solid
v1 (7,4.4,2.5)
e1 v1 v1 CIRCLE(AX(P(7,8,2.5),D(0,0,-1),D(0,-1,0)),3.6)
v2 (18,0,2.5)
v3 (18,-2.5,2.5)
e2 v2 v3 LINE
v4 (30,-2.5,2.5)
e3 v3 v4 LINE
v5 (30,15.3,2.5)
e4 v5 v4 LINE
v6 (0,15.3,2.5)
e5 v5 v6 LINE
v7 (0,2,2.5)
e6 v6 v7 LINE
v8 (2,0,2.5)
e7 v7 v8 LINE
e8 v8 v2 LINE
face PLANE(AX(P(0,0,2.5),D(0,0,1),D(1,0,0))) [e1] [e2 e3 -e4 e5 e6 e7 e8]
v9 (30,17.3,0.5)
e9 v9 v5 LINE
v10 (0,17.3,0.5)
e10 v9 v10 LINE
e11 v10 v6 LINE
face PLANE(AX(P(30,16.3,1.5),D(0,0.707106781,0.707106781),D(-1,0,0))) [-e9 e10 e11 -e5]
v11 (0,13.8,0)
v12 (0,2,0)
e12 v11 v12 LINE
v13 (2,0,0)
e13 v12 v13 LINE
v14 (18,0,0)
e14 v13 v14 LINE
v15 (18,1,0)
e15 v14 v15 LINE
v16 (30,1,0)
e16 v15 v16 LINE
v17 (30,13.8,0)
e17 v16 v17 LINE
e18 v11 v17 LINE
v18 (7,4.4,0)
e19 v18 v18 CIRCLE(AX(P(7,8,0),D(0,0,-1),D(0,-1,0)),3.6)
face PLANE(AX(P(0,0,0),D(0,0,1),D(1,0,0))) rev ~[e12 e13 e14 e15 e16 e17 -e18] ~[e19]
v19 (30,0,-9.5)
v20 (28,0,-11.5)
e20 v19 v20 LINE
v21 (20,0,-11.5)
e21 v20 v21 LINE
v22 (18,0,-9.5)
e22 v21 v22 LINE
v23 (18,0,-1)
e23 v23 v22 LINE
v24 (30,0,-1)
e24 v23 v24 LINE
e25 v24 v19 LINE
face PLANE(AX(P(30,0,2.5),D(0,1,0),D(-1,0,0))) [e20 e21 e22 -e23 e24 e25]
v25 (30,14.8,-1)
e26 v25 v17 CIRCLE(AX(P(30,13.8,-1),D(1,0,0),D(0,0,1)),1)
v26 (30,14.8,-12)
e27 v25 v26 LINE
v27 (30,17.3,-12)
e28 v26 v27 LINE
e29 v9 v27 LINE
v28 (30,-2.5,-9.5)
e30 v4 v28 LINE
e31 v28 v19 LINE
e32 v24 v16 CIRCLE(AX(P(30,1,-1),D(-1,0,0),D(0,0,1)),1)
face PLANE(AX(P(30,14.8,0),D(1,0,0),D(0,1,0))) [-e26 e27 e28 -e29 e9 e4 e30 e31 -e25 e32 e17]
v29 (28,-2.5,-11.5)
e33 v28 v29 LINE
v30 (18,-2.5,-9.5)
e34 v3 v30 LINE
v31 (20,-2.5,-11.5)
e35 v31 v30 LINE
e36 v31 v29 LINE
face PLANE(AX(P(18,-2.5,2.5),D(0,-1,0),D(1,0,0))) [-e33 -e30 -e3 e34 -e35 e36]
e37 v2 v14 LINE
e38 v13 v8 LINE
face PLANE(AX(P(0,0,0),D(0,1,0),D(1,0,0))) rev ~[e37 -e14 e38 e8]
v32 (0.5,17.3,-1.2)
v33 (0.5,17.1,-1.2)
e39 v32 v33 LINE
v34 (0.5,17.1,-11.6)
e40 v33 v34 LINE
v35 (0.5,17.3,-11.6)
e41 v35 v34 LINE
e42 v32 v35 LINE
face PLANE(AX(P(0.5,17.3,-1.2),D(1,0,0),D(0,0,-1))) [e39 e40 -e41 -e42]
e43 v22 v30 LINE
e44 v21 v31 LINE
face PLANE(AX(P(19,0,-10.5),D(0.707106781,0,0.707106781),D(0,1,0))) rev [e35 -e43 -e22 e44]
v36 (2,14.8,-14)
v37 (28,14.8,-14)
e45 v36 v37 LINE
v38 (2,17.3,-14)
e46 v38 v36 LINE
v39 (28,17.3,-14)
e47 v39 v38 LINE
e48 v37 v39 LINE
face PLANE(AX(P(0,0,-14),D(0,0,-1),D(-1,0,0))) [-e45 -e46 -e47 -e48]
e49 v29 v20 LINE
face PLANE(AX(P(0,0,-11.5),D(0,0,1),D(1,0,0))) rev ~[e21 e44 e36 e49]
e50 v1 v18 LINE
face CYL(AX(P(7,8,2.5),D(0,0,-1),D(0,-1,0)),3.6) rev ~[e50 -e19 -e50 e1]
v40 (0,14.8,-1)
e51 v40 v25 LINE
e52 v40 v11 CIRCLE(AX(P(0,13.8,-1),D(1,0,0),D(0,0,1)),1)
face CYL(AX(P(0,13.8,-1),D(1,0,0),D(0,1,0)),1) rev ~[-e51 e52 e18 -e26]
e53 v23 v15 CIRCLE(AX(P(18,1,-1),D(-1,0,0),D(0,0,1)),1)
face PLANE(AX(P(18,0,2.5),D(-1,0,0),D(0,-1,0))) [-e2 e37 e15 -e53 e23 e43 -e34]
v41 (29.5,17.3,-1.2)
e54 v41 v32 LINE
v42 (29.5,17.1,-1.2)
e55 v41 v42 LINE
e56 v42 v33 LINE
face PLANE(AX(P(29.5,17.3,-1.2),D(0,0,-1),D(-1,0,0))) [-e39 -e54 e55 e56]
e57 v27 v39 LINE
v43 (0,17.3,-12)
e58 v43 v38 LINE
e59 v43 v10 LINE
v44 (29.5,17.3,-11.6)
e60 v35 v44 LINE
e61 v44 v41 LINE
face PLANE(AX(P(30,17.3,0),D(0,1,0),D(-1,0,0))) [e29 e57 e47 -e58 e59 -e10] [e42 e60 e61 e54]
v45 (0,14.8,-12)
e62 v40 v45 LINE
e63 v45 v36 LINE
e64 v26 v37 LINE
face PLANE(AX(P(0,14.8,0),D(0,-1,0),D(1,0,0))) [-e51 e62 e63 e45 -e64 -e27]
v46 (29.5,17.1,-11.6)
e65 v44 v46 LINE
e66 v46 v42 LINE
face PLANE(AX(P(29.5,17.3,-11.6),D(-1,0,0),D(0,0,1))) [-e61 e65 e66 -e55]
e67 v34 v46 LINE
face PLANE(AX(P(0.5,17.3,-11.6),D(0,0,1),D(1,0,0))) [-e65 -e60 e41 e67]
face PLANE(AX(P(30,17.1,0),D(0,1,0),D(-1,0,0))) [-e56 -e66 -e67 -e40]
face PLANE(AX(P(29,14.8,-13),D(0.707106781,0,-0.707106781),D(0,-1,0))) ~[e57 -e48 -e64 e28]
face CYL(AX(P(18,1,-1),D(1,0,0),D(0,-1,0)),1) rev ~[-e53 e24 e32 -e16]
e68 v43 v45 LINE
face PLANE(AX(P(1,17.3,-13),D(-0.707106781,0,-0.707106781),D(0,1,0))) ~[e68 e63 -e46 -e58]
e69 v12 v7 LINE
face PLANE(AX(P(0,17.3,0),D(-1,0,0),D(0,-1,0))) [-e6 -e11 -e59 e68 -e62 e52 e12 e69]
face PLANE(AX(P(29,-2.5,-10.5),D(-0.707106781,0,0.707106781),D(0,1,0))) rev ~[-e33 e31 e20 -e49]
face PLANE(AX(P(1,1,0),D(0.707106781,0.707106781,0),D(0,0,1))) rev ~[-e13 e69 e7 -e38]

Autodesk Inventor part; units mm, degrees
ref_plane "YZ Plane" through (0, 0, 0) normal (1, 0, 0) x (0, 1, 0)
ref_plane "XZ Plane" through (0, 0, 0) normal (0, 1, 0) x (-1, 0, 0)
ref_plane "XY Plane" through (0, 0, 0) normal (0, 0, 1) x (1, 0, 0)
sketch "Sketch1" plane through (0, 0, 0) normal (0, 0, 1) x (1, 0, 0)
  line L0 (0, 0) -> (30, 0)
  line L1 (30, 0) -> (30, 17.3)
  line L2 (30, 17.3) -> (0, 17.3)
  line L3 (0, 17.3) -> (0, 0)
  dimension "d0" = 30
  dimension "d1" = 17.3
extrude "Extrusion1" add sketch "Sketch1" along normal blind 2.5
sketch "Sketch2" plane through (0, 0, 2.5) normal (0, 0, 1) x (1, 0, 0)
  line L0 (0, 17.3) -> (0, 0) projected
  line L1 (0, 0) -> (30, 0) projected
  point P0 (7, 8)
  dimension "d4" = 7
  dimension "d12" = 8
hole "Hole1" at (7, 8, 2.5) direction (0, 0, -1) diameter 7.2 end through all
sketch "Sketch3" plane through (0, 0, 2.5) normal (0, 0, 1) x (1, 0, 0)
  line L0 (30, 0) -> (30, 17.3) projected
  line L1 (30, 0) -> (18, 0)
  line L2 (18, 0) -> (18, -2.5)
  line L3 (18, -2.5) -> (30, -2.5)
  line L4 (30, -2.5) -> (30, 0)
  point P0 (0, 0)
  dimension "d13" = 2.5
  dimension "d14" = 12
extrude "Extrusion2" add sketch "Sketch3" against normal blind 14
sketch "Sketch4" plane through (18, 0, 0) normal (0, 1, 0) x (1, 0, 0)
  line L0 (3.25, 3) -> (8.75, 3)
  line L1 (8.75, 3) -> (8.75, 8.5)
  line L2 (8.75, 8.5) -> (3.25, 8.5)
  line L3 (3.25, 8.5) -> (3.25, 3)
  line L4 (0, 0) -> (0, 11.5) projected
  line L5 (0, 11.5) -> (12, 11.5) projected
  point P0 (-18, 0)
  point P1 (3.25, 5.75)
  point P2 (0, 5.75)
  point P3 (6, 8.5)
  point P4 (6, 11.5)
  dimension "d17" = 5.5
extrude "Extrusion3" [suppressed]
fillet "Fillet1" [suppressed]
fillet "Fillet2" [suppressed]
fillet "Fillet3" radius 1 1 edges at (24, 0, 0)
sketch "Sketch5" plane through (0, 0, 0) normal (0, 0, -1) x (-1, 0, 0)
  line L0 (-30, 17.3) -> (0, 17.3) projected
  line L1 (-30, 1) -> (-30, 17.3) projected
  line L2 (0, 17.3) -> (0, 0) projected
  line L3 (-30, -2.5) -> (-30, 17.3) projected
  line L4 (0, 14.8) -> (-30, 14.8)
  point P0 (0, 2)
  dimension "d26" = 2.5
extrude "Extrusion4" add sketch "Sketch5" along normal blind 14
chamfer "Chamfer2" distance 2 angle 45 6 edges at (0, 0, 1.25) (18, -1.25, -11.5) (0, 16.05, -14) (30, 16.05, -14) (15, 17.3, 2.5) (30, -1.25, -11.5)
fillet "Fillet4" radius 1 1 edges at (15, 14.8, 0)
sketch "Sketch6" plane through (0, 17.3, 0.5) normal (0, 1, 0) x (1, 0, 0)
  line L0 (29.5, 12.1) -> (0.5, 12.1)
  line L1 (0.5, 12.1) -> (0.5, 1.7)
  line L2 (0.5, 1.7) -> (29.5, 1.7)
  line L3 (29.5, 1.7) -> (29.5, 12.1)
  line L4 (0, 12.5) -> (0, 0) projected
  line L5 (30, 12.5) -> (30, 0) projected
  line L6 (2, 14.5) -> (28, 14.5) projected
  point P0 (0, 0.5)
  dimension "d33" = 10.4
  dimension "d34" = 0.5
  dimension "d36" = 0.5
  dimension "d37" = 2.4
emboss "Emboss1" sketch "Sketch6" operation cut depth 0.2 direction (0, -1, 0)
properties part number "GF1002 mount"
